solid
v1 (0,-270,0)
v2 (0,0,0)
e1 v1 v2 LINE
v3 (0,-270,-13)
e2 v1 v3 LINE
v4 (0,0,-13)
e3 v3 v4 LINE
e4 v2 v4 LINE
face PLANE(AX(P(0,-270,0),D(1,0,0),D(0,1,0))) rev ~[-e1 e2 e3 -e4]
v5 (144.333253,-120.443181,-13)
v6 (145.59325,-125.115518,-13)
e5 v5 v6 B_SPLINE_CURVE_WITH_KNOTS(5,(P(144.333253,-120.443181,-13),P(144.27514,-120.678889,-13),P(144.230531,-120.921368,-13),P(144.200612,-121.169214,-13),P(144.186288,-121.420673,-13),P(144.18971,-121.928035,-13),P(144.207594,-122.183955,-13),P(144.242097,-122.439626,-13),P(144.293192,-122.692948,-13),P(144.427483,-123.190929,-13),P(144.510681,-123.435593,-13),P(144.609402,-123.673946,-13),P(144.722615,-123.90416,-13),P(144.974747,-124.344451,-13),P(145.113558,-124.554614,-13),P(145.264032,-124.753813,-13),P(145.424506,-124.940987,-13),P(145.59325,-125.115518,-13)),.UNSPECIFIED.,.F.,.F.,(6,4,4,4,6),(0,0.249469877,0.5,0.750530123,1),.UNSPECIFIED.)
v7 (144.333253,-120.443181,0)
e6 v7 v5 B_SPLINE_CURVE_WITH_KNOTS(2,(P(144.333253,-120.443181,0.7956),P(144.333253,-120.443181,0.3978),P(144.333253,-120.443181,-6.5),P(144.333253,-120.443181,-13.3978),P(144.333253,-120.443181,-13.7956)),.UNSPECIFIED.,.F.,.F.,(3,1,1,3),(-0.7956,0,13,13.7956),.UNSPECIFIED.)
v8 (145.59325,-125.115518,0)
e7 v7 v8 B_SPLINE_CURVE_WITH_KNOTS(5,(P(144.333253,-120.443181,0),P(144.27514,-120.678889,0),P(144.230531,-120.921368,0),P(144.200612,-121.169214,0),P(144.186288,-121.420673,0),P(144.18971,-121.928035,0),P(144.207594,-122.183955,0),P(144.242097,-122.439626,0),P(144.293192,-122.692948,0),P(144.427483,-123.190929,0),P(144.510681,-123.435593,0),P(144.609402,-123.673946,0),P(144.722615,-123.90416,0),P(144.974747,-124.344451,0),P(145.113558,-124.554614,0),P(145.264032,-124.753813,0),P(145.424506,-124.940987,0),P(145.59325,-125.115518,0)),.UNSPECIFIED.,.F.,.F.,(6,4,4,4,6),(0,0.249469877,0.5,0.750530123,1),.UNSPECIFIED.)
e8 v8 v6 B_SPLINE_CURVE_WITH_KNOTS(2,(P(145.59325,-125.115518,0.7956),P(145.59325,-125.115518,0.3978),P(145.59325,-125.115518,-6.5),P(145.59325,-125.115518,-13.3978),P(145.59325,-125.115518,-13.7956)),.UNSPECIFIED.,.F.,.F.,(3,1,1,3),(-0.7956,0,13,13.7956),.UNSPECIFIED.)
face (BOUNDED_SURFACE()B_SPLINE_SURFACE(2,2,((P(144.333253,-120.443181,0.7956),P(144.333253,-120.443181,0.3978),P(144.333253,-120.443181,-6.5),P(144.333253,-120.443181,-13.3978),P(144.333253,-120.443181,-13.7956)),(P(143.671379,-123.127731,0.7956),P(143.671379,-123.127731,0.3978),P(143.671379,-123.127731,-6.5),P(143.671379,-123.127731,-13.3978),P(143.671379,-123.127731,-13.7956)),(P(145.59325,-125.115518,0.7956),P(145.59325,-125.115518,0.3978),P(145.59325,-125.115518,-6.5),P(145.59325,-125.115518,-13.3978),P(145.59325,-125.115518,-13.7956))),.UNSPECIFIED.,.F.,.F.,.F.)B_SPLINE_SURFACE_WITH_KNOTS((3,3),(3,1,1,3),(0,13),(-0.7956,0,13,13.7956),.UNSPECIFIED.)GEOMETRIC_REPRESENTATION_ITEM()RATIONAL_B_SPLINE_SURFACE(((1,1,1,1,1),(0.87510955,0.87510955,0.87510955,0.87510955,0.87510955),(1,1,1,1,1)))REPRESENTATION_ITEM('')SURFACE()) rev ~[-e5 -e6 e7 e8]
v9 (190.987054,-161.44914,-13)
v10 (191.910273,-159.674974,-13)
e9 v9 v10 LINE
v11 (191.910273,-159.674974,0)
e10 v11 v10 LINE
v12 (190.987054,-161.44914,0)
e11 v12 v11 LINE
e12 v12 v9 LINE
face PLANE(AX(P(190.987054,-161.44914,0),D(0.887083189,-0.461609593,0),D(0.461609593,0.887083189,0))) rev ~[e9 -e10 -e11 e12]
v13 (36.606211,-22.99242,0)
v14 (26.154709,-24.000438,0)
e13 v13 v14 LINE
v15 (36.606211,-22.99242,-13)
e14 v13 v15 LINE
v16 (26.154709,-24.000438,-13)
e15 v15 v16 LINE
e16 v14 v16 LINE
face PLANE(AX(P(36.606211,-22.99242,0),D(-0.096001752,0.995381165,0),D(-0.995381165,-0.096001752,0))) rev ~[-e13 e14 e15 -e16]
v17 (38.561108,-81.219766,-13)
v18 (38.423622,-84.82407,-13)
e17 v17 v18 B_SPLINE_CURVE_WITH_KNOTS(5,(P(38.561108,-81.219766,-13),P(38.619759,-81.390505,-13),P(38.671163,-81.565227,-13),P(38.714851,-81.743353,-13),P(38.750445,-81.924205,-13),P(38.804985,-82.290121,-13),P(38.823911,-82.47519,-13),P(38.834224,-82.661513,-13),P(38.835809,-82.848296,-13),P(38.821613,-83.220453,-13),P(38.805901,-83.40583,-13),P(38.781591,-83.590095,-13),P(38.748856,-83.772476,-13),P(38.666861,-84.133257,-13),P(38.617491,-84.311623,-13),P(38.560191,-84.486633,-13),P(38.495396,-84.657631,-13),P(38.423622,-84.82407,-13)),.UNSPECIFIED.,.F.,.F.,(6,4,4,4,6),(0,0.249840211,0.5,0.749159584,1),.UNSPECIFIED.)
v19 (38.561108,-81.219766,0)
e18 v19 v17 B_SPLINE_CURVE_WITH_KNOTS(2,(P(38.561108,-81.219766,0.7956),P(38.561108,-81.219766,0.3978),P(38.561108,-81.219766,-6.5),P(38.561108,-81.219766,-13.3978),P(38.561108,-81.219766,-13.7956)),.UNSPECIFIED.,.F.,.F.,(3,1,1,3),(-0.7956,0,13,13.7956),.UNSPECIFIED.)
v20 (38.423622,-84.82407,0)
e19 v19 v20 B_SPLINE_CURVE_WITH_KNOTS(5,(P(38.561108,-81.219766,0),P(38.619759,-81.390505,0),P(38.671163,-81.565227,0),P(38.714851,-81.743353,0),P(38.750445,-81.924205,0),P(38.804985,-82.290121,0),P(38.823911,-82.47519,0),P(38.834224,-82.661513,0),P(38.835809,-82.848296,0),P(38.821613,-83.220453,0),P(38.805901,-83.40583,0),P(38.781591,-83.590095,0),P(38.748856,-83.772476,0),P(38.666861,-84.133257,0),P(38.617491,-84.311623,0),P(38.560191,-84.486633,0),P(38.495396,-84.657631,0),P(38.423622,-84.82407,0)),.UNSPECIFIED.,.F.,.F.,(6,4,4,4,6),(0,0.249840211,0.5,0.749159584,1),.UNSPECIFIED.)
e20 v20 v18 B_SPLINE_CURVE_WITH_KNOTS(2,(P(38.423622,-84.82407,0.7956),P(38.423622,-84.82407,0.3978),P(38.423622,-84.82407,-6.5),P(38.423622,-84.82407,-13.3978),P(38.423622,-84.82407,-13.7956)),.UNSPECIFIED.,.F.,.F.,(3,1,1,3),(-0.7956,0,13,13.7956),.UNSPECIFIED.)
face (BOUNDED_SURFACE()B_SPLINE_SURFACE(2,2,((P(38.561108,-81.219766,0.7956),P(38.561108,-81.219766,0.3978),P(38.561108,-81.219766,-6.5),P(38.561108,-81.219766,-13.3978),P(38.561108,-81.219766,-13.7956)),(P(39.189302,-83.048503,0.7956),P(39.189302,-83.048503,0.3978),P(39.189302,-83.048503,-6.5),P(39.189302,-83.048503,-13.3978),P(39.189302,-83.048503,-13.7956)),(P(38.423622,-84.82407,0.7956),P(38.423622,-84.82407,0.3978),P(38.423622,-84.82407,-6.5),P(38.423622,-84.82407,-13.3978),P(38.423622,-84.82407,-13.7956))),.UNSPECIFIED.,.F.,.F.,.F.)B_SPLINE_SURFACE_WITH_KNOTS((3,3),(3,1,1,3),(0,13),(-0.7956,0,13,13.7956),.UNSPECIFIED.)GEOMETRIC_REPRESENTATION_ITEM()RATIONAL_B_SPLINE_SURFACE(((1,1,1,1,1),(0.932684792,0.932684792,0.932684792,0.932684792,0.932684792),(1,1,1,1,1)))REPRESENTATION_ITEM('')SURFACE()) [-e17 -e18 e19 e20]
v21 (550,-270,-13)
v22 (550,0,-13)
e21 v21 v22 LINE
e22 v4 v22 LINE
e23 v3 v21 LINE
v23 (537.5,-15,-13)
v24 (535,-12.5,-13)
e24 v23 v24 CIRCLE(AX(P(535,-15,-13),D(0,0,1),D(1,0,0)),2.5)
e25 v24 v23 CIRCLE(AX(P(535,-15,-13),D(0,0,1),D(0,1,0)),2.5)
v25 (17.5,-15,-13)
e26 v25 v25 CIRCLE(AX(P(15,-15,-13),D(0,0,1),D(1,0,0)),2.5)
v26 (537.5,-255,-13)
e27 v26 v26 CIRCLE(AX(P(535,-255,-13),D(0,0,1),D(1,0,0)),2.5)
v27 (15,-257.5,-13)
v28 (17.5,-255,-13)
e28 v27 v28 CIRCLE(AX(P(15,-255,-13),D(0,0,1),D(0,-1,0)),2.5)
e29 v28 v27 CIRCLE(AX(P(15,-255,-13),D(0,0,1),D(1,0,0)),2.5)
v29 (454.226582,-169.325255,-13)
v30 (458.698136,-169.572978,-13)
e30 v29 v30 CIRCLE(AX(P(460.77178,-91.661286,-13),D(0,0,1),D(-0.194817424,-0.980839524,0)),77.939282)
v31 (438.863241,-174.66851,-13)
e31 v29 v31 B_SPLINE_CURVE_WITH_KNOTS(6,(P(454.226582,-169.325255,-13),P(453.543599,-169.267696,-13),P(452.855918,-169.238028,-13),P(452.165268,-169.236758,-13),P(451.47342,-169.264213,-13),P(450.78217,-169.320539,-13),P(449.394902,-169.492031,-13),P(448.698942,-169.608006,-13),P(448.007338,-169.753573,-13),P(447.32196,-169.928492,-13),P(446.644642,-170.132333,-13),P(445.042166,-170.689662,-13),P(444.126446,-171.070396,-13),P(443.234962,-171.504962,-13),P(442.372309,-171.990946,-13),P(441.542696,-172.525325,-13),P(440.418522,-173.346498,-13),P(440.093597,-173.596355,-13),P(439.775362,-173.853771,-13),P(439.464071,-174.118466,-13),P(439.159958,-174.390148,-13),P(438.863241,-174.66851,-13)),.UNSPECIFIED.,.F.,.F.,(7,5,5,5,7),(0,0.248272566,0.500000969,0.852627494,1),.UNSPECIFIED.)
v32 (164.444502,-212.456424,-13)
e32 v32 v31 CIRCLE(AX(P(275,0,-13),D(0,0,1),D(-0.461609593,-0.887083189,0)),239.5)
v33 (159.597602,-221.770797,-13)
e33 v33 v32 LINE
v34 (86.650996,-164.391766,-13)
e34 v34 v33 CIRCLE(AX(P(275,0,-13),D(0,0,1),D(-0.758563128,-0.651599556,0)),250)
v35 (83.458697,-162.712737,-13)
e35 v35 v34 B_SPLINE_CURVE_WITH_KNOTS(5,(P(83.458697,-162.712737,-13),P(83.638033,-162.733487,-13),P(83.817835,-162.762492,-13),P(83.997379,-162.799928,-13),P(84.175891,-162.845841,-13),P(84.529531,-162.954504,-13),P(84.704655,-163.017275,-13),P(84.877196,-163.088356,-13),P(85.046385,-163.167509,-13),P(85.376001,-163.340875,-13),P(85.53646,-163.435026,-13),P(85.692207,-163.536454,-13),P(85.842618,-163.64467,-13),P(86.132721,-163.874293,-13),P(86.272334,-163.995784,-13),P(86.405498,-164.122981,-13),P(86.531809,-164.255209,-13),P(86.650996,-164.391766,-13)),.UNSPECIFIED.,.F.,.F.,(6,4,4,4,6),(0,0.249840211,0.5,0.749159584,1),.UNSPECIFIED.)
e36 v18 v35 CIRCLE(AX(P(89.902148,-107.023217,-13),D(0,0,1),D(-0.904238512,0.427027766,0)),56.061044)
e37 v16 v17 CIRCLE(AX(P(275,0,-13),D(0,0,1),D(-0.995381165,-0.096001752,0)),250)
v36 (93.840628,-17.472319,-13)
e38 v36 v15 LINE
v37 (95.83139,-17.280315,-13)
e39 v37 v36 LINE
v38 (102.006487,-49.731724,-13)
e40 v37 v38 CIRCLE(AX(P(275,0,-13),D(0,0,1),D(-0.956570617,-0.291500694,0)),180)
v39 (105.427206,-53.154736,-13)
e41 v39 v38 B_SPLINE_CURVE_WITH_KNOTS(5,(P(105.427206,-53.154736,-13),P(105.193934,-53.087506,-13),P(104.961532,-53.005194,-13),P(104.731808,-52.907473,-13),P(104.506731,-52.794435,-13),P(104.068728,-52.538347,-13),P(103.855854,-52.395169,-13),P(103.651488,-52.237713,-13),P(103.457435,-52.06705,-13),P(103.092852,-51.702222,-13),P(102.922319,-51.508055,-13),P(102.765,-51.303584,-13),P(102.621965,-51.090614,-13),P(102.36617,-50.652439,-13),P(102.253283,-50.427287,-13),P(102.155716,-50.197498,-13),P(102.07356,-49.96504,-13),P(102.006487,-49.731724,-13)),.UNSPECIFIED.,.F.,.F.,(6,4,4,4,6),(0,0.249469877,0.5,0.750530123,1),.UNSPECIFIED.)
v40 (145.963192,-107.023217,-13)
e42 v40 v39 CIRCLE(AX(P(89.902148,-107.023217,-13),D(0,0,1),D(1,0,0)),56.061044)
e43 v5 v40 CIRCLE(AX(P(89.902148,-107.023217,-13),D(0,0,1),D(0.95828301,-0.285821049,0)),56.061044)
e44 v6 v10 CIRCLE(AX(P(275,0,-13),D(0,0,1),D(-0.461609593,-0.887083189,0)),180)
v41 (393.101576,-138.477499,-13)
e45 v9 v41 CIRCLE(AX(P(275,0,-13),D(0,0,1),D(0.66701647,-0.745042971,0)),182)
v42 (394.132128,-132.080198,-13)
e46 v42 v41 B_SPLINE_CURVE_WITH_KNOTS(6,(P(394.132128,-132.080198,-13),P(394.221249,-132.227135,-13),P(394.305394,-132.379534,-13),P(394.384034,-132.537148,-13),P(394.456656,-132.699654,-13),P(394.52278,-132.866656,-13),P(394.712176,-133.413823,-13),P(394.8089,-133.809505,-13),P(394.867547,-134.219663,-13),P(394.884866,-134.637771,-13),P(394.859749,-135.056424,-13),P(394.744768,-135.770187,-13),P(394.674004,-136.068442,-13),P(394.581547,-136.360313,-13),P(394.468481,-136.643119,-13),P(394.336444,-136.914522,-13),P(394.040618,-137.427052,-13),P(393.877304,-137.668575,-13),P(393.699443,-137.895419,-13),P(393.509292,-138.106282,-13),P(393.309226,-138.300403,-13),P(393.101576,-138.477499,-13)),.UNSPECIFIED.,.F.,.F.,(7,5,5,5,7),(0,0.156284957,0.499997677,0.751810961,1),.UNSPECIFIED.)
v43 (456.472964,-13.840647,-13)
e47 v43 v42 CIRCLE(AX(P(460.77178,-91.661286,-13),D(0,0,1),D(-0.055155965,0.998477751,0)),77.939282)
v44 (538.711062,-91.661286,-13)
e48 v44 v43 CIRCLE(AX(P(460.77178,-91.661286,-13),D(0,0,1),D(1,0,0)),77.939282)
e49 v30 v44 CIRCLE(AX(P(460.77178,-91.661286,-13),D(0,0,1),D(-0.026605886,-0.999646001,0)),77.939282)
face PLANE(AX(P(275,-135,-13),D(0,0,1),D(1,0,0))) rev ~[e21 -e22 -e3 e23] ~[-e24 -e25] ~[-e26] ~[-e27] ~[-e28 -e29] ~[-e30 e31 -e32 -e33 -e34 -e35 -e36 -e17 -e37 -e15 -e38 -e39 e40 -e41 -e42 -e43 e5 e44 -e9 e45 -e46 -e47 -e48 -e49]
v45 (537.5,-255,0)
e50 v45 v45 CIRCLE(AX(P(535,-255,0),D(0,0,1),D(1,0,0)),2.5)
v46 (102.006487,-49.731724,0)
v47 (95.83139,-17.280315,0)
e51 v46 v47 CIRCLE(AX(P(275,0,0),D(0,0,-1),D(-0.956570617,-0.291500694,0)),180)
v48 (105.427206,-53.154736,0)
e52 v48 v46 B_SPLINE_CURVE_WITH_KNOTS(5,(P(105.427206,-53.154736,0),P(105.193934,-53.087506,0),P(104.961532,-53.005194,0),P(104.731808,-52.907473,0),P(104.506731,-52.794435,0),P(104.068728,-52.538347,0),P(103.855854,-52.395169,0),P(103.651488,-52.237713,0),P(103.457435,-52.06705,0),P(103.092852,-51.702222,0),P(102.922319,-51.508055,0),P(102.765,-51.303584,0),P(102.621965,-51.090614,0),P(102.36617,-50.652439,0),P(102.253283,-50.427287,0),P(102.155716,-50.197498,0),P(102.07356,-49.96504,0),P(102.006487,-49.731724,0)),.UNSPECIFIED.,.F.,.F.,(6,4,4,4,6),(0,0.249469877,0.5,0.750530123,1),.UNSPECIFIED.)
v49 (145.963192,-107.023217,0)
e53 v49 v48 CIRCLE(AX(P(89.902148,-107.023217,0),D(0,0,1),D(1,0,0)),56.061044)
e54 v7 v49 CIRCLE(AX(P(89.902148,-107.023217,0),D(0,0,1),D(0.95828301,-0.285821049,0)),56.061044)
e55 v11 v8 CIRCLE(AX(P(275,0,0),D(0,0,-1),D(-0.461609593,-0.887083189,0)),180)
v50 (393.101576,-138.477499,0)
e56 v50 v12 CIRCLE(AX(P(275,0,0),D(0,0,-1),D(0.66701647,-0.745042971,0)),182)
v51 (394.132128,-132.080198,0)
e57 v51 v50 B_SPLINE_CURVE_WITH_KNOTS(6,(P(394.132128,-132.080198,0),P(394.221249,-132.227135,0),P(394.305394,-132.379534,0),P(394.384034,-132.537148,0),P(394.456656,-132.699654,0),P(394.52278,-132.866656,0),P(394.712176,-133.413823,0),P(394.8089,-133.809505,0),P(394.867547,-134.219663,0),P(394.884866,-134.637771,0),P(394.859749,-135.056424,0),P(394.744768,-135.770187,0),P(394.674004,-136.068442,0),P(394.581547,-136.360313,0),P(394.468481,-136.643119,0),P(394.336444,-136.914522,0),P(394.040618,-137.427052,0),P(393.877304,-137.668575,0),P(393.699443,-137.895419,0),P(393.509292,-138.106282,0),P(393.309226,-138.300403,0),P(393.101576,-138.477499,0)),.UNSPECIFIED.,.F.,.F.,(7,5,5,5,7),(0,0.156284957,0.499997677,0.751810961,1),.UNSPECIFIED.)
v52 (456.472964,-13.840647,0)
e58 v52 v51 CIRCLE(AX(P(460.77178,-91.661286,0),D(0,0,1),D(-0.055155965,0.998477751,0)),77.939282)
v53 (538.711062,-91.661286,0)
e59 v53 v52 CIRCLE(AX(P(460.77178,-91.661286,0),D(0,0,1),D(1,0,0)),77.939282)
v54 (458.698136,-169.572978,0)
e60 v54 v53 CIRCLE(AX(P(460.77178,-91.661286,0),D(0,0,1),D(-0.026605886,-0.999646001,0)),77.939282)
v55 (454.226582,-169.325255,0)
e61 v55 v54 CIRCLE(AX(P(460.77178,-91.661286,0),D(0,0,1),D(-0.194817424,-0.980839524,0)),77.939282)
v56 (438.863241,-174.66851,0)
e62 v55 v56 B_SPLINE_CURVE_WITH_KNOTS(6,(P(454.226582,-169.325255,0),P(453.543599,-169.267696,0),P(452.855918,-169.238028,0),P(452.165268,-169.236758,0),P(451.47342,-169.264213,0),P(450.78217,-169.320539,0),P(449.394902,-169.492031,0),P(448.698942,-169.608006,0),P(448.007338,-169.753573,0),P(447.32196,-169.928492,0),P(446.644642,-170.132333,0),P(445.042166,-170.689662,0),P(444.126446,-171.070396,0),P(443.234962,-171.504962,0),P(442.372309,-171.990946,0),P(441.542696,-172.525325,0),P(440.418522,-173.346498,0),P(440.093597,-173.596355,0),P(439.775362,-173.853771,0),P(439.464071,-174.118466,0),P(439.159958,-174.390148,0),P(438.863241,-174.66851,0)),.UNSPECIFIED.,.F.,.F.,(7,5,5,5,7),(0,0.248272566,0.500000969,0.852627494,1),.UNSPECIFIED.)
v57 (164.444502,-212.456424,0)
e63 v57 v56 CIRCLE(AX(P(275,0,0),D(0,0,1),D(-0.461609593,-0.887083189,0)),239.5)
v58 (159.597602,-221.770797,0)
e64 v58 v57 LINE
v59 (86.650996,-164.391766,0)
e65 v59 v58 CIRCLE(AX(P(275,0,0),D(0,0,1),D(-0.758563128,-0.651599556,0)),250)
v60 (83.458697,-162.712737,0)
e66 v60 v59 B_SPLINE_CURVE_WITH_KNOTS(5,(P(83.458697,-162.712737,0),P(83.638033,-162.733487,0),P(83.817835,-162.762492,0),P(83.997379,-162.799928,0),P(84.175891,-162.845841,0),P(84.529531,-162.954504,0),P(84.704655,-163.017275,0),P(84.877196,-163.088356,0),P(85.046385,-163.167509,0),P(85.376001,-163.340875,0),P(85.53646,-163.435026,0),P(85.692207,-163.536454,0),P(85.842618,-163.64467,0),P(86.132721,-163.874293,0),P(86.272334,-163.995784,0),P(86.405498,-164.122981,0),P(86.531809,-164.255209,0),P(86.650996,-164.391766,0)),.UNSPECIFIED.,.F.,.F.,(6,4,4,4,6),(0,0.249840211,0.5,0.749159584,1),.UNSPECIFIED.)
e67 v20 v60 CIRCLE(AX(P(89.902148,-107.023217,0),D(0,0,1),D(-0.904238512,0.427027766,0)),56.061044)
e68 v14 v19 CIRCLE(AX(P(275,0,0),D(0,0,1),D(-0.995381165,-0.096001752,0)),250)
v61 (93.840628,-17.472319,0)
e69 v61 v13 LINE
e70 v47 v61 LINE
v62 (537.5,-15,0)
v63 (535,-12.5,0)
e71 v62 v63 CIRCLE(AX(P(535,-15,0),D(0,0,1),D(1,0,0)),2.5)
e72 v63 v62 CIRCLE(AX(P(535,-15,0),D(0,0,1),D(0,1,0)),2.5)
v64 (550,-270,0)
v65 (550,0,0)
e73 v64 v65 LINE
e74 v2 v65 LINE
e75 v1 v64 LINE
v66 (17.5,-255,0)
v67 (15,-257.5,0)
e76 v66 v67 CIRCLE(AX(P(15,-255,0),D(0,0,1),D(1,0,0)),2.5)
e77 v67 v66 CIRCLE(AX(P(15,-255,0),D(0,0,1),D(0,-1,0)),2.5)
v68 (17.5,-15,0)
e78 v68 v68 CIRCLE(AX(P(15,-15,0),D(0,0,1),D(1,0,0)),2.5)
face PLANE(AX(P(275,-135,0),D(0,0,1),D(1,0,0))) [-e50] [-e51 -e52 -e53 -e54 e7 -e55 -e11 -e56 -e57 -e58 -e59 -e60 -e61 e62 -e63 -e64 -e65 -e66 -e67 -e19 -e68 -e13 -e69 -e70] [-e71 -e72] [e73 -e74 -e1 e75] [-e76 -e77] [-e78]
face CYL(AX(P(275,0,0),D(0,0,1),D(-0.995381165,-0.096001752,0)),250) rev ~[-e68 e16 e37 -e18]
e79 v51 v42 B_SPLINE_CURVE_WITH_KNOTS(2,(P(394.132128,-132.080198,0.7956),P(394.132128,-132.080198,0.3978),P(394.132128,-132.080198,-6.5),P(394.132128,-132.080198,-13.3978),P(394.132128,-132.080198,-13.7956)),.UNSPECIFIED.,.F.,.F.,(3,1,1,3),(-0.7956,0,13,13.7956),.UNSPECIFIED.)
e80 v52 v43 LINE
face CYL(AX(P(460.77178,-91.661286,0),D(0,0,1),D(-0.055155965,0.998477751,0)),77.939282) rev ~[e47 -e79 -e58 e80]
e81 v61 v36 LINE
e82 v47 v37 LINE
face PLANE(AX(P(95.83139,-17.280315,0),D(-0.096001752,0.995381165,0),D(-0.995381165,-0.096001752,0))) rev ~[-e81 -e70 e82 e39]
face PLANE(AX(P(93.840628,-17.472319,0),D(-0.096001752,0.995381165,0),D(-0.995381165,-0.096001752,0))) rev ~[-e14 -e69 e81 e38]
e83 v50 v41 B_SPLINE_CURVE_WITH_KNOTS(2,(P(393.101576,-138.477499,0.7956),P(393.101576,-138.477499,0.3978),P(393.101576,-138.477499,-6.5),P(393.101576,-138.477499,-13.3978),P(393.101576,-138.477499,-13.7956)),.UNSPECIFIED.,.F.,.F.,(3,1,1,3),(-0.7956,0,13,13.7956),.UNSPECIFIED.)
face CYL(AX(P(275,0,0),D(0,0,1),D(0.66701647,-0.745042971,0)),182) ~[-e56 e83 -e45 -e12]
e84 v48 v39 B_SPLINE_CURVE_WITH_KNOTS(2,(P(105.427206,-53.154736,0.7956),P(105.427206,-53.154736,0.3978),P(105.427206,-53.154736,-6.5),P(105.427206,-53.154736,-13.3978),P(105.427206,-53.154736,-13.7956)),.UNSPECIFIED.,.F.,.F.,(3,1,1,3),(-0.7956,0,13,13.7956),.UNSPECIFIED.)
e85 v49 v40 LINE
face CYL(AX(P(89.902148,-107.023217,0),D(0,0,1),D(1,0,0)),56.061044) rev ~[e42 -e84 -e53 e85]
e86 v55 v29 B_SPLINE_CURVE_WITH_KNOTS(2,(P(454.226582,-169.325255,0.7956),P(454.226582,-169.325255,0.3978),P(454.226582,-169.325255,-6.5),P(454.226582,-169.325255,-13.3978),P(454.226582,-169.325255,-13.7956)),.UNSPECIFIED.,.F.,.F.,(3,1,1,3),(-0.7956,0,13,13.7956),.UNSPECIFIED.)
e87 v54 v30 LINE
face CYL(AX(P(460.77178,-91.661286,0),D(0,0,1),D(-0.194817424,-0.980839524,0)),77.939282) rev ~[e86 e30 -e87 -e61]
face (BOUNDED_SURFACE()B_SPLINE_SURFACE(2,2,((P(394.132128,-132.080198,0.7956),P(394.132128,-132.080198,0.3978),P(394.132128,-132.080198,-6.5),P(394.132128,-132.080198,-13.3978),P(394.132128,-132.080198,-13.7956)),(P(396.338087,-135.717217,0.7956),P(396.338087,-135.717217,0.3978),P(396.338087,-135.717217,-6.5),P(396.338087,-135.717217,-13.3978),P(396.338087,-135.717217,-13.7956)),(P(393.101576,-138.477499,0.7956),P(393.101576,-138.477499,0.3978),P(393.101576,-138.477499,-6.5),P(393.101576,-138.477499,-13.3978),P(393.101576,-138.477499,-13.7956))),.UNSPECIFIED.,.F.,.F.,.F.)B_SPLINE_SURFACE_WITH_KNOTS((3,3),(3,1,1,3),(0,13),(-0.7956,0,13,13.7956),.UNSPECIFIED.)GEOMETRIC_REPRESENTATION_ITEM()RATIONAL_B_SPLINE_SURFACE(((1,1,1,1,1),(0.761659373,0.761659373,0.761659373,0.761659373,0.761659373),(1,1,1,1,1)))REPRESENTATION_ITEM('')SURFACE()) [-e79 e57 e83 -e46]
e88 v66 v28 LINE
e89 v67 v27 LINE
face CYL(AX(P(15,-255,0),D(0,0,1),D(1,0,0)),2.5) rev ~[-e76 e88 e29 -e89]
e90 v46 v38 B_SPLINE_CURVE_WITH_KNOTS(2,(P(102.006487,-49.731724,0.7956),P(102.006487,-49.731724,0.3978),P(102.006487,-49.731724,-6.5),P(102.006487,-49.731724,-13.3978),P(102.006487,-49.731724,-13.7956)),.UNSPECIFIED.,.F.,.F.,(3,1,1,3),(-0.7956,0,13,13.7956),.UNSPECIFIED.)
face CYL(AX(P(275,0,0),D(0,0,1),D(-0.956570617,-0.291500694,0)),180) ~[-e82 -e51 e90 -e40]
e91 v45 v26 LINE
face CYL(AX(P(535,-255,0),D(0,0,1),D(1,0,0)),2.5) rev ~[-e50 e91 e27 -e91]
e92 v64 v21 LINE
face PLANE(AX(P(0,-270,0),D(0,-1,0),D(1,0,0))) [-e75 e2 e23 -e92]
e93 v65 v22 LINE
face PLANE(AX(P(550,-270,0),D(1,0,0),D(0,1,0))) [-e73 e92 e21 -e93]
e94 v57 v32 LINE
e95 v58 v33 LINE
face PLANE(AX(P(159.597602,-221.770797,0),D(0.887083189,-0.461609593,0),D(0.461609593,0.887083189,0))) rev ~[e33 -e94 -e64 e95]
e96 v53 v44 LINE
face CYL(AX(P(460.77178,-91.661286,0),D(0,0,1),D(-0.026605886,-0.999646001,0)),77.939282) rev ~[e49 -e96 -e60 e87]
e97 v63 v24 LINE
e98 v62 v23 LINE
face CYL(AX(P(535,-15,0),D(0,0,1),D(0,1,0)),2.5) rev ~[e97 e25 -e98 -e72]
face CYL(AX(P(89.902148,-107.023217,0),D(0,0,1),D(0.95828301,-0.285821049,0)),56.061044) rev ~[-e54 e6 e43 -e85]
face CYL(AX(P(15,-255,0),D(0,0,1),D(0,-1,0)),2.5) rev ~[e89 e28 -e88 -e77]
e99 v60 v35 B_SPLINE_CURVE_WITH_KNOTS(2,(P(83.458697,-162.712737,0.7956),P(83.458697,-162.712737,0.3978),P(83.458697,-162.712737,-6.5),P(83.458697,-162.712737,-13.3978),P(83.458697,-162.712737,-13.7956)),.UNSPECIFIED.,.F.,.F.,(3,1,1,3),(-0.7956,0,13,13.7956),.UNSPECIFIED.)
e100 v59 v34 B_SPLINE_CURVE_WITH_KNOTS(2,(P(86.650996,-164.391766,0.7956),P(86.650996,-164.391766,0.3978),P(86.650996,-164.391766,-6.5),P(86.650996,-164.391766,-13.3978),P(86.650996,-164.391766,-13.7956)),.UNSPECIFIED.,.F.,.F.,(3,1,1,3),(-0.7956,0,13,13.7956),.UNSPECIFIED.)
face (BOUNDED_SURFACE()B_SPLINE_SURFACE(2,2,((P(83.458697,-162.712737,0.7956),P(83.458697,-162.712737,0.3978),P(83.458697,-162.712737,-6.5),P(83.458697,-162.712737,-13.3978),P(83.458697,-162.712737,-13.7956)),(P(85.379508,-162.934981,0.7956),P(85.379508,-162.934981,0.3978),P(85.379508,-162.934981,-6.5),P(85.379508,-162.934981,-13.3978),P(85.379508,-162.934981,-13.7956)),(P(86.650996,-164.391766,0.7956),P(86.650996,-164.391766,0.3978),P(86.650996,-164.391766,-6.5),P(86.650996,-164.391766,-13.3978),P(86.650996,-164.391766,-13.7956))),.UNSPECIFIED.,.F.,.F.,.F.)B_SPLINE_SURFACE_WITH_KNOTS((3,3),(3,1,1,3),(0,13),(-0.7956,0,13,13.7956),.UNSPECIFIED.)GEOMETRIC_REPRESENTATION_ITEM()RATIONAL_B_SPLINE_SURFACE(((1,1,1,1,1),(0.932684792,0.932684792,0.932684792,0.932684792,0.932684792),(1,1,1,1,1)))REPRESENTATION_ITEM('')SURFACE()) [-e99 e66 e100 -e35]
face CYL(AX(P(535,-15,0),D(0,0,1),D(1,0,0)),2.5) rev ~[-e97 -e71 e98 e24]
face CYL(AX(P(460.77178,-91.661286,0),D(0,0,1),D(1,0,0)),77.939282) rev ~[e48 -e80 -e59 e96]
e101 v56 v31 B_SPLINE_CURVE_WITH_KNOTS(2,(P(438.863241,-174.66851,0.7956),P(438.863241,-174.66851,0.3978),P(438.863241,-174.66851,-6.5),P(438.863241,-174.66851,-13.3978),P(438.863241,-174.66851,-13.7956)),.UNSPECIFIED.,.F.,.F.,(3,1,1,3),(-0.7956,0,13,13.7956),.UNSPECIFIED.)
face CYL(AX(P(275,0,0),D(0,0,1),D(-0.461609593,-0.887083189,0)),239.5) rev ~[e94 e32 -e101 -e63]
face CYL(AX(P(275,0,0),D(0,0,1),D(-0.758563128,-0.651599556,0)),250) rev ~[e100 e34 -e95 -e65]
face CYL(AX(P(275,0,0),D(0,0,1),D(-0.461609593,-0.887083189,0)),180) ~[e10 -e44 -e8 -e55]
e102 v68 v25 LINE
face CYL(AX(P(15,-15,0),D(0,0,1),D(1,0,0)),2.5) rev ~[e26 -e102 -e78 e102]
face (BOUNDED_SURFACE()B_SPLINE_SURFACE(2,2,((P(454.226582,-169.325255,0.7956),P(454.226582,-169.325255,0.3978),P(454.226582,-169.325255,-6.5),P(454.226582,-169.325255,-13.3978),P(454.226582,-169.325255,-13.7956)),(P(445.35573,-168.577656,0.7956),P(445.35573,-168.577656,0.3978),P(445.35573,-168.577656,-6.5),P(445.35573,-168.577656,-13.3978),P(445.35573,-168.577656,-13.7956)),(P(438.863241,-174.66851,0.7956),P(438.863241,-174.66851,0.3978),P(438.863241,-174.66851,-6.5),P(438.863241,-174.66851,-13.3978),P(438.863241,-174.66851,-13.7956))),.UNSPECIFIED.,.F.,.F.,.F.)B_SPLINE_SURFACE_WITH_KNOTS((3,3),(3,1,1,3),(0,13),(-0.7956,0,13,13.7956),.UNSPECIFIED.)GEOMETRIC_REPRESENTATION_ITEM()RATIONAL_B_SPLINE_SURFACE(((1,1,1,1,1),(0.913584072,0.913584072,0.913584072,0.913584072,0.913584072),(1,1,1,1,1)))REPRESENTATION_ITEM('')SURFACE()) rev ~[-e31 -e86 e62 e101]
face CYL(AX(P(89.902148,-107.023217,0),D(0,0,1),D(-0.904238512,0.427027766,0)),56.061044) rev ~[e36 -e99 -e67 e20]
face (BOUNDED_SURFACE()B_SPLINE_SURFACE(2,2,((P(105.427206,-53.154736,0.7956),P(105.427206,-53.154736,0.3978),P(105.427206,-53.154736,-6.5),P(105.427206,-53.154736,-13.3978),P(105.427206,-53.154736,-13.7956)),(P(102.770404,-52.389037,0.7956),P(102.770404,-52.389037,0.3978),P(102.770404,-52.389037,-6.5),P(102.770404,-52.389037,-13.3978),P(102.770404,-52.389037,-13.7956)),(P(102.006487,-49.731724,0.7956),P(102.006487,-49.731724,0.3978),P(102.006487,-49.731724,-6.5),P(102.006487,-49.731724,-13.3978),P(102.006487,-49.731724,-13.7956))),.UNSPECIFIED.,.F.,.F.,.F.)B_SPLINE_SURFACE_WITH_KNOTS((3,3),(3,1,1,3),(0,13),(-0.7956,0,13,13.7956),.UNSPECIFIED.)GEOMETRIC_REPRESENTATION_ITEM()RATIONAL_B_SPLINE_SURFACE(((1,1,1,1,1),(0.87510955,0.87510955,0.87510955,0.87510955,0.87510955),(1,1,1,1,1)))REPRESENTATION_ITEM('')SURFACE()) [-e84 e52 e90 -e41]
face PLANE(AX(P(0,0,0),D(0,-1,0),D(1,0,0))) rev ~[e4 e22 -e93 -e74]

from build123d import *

# Parameters (mm, degrees)
F0_W     = 550
F0_H     = 270
F1_DEPTH = 13
F2_R     = 2.5
F3_DEPTH = 25
F4_R     = 5
F5_R     = 20


with BuildPart() as f1:
    # F0 (on Top) → F1 (new body)
    with BuildSketch(Plane.XY):
        with Locations((275, -135)):
            Rectangle(F0_W, F0_H)
    extrude(amount=-F1_DEPTH)

    # F2 (on face) → F3 (cut)
    with BuildSketch(Plane.XY):
        with BuildLine():
            ThreePointArc((102.8172889589, -52.4701250099), (119.1726628165, -90.0990620723), (143.6244940218, -123.0466433063))
            ThreePointArc((143.6244940218, -123.0466433063), (145.375436454, -115.11981647), (145.9631920321, -107.023216784))
            ThreePointArc((145.9631920321, -107.023216784), (133.8730301026, -72.2467564476), (102.8172889589, -52.4701250099))
        make_face()
        with BuildLine():
            ThreePointArc((46.4524007703, -71.5977994519), (67.6630708031, -119.8818075906), (98.9269281749, -162.353082441))
            ThreePointArc((98.9269281749, -162.353082441), (126.0574308053, -149.8675419291), (142.9268949098, -125.2225814773))
            ThreePointArc((142.9268949098, -125.2225814773), (117.4412479589, -91.100162762), (100.5834584289, -51.9891337337))
            ThreePointArc((100.5834584289, -51.9891337337), (70.8084957225, -54.3138897804), (46.4524007703, -71.5977994519))
        make_face()
        with BuildLine():
            ThreePointArc((36.6062109858, -22.9924196081), (40.2678425285, -47.5506492992), (46.4524007703, -71.5977994519))
            ThreePointArc((46.4524007703, -71.5977994519), (70.8084957225, -54.3138897804), (100.5834584289, -51.9891337337))
            ThreePointArc((100.5834584289, -51.9891337337), (96.3763447636, -34.89397928), (93.8406279725, -17.4723188671))
            Line((93.8406279725, -17.4723188671), (36.6062109858, -22.9924196081))
        make_face()
        with BuildLine():
            ThreePointArc((26.1547087534, -24.0004380043), (30.8880481953, -53.9384370008), (39.2095922874, -83.0835942334))
            ThreePointArc((39.2095922874, -83.0835942334), (42.4819606163, -77.1205988593), (46.4524007703, -71.5977994519))
            ThreePointArc((46.4524007703, -71.5977994519), (40.2678425285, -47.5506492992), (36.6062109858, -22.9924196081))
            Line((36.6062109858, -22.9924196081), (26.1547087534, -24.0004380043))
        make_face()
        with BuildLine():
            ThreePointArc((39.2095922874, -83.0835942334), (58.5731428007, -125.1375862115), (85.359218008, -162.8998889056))
            ThreePointArc((85.359218008, -162.8998889056), (92.159689712, -163.0387878421), (98.9269281749, -162.353082441))
            ThreePointArc((98.9269281749, -162.353082441), (67.6630708031, -119.8818075906), (46.4524007703, -71.5977994519))
            ThreePointArc((46.4524007703, -71.5977994519), (42.4819606163, -77.1205988593), (39.2095922874, -83.0835942334))
        make_face()
        with BuildLine():
            ThreePointArc((39.2095922874, -83.0835942334), (41.3696850637, -135.0845918815), (85.359218008, -162.8998889056))
            ThreePointArc((85.359218008, -162.8998889056), (58.5731428007, -125.1375862115), (39.2095922874, -83.0835942334))
        make_face()
        with BuildLine():
            ThreePointArc((98.9269281749, -162.353082441), (129.5126452175, -190.2463655327), (164.4445024089, -212.4564236553))
            Line((164.4445024089, -212.4564236553), (190.9870540226, -161.4491403142))
            ThreePointArc((190.9870540226, -161.4491403142), (165.4491613095, -145.3362093293), (142.9268949098, -125.2225814773))
            ThreePointArc((142.9268949098, -125.2225814773), (126.0574308053, -149.8675419291), (98.9269281749, -162.353082441))
        make_face()
        with BuildLine():
            ThreePointArc((85.359218008, -162.8998889056), (119.6639725539, -195.884452107), (159.5976016794, -221.7707971349))
            Line((159.5976016794, -221.7707971349), (164.4445024089, -212.4564236553))
            ThreePointArc((164.4445024089, -212.4564236553), (129.5126452175, -190.2463655327), (98.9269281749, -162.353082441))
            ThreePointArc((98.9269281749, -162.353082441), (92.159689712, -163.0387878421), (85.359218008, -162.8998889056))
        make_face()
        with BuildLine():
            ThreePointArc((142.9268949098, -125.2225814773), (165.4491613095, -145.3362093293), (190.9870540226, -161.4491403142))
            Line((190.9870540226, -161.4491403142), (191.9102732092, -159.6749739371))
            ThreePointArc((191.9102732092, -159.6749739371), (166.2146946142, -143.4076613439), (143.6244940218, -123.0466433063))
            ThreePointArc((143.6244940218, -123.0466433063), (143.2867819227, -124.1381669965), (142.9268949098, -125.2225814773))
        make_face()
        with BuildLine():
            Line((190.9870540226, -161.4491403142), (164.4445024089, -212.4564236553))
            ThreePointArc((164.4445024089, -212.4564236553), (312.3186805101, -236.5746522453), (445.5878496959, -168.1072144083))
            ThreePointArc((445.5878496959, -168.1072144083), (417.7995521532, -156.6837386519), (396.3969974723, -135.5978207964))
            ThreePointArc((396.3969974723, -135.5978207964), (297.7258554679, -180.5755672655), (190.9870540226, -161.4491403142))
        make_face()
        with BuildLine():
            ThreePointArc((396.3969974723, -135.5978207964), (417.7995521532, -156.6837386519), (445.5878496959, -168.1072144083))
            ThreePointArc((445.5878496959, -168.1072144083), (489.778644371, -105.9735057557), (512.2017629268, -33.0994511193))
            ThreePointArc((512.2017629268, -33.0994511193), (486.2288437534, -17.9967113583), (456.4729635167, -13.8406471114))
            ThreePointArc((456.4729635167, -13.8406471114), (438.2138341358, -80.5310148123), (396.3969974723, -135.5978207964))
        make_face()
        with BuildLine():
            ThreePointArc((395.2793152892, -133.9137271289), (395.8326968589, -134.7593972826), (396.3969974723, -135.5978207964))
            ThreePointArc((396.3969974723, -135.5978207964), (438.2138341358, -80.5310148123), (456.4729635167, -13.8406471114))
            ThreePointArc((456.4729635167, -13.8406471114), (391.3304963156, -56.2714595868), (395.2793152892, -133.9137271289))
        make_face()
        with BuildLine():
            ThreePointArc((445.5878496959, -168.1072144083), (452.1119253863, -169.1179747106), (458.6981361528, -169.5729777234))
            ThreePointArc((458.6981361528, -169.5729777234), (515.1450884683, -147.5010120731), (538.711061865, -91.6612861494))
            ThreePointArc((538.711061865, -91.6612861494), (531.7751165183, -59.5200686387), (512.2017629268, -33.0994511193))
            ThreePointArc((512.2017629268, -33.0994511193), (489.778644371, -105.9735057557), (445.5878496959, -168.1072144083))
        make_face()
        with BuildLine():
            ThreePointArc((17.5, -255), (13.232233047, -253.232233047), (15, -257.5))
            ThreePointArc((15, -257.5), (16.767766953, -256.767766953), (17.5, -255))
        make_face()
        with Locations((15, -15)):
            Circle(F2_R)
        with BuildLine():
            ThreePointArc((537.5, -15), (536.767766953, -13.232233047), (535, -12.5))
            ThreePointArc((535, -12.5), (533.232233047, -16.767766953), (537.5, -15))
        make_face()
        with Locations((535, -255)):
            Circle(F2_R)
        with BuildLine():
            ThreePointArc((100.5834584289, -51.9891337337), (117.4412479589, -91.100162762), (142.9268949098, -125.2225814773))
            ThreePointArc((142.9268949098, -125.2225814773), (143.2867819227, -124.1381669965), (143.6244940218, -123.0466433063))
            ThreePointArc((143.6244940218, -123.0466433063), (119.1726628165, -90.0990620723), (102.8172889589, -52.4701250099))
            ThreePointArc((102.8172889589, -52.4701250099), (101.702824577, -52.2182469254), (100.5834584289, -51.9891337337))
        make_face()
        with BuildLine():
            ThreePointArc((93.8406279725, -17.4723188671), (96.3763447636, -34.89397928), (100.5834584289, -51.9891337337))
            ThreePointArc((100.5834584289, -51.9891337337), (101.702824577, -52.2182469254), (102.8172889589, -52.4701250099))
            ThreePointArc((102.8172889589, -52.4701250099), (98.4454239564, -35.0497029669), (95.8313903025, -17.2803153631))
            Line((95.8313903025, -17.2803153631), (93.8406279725, -17.4723188671))
        make_face()
    extrude(amount=-F3_DEPTH, mode=Mode.SUBTRACT)

    # F4
    f4_edges = [f1.edges().sort_by_distance(p)[0] for p in [
        (102.817289, -52.470125, -6.5),
        (143.624494, -123.046643, -6.5),
        (39.209592, -83.083594, -6.5),
        (85.359218, -162.899889, -6.5),
        (396.396997, -135.597821, -6.5),
    ]]
    fillet(f4_edges, radius=F4_R)

    # F5
    f5_edges = [f1.edges().sort_by_distance(p)[0] for p in [
        (445.58785, -168.107214, -6.5),
    ]]
    fillet(f5_edges, radius=F5_R)


solid = f1.part
